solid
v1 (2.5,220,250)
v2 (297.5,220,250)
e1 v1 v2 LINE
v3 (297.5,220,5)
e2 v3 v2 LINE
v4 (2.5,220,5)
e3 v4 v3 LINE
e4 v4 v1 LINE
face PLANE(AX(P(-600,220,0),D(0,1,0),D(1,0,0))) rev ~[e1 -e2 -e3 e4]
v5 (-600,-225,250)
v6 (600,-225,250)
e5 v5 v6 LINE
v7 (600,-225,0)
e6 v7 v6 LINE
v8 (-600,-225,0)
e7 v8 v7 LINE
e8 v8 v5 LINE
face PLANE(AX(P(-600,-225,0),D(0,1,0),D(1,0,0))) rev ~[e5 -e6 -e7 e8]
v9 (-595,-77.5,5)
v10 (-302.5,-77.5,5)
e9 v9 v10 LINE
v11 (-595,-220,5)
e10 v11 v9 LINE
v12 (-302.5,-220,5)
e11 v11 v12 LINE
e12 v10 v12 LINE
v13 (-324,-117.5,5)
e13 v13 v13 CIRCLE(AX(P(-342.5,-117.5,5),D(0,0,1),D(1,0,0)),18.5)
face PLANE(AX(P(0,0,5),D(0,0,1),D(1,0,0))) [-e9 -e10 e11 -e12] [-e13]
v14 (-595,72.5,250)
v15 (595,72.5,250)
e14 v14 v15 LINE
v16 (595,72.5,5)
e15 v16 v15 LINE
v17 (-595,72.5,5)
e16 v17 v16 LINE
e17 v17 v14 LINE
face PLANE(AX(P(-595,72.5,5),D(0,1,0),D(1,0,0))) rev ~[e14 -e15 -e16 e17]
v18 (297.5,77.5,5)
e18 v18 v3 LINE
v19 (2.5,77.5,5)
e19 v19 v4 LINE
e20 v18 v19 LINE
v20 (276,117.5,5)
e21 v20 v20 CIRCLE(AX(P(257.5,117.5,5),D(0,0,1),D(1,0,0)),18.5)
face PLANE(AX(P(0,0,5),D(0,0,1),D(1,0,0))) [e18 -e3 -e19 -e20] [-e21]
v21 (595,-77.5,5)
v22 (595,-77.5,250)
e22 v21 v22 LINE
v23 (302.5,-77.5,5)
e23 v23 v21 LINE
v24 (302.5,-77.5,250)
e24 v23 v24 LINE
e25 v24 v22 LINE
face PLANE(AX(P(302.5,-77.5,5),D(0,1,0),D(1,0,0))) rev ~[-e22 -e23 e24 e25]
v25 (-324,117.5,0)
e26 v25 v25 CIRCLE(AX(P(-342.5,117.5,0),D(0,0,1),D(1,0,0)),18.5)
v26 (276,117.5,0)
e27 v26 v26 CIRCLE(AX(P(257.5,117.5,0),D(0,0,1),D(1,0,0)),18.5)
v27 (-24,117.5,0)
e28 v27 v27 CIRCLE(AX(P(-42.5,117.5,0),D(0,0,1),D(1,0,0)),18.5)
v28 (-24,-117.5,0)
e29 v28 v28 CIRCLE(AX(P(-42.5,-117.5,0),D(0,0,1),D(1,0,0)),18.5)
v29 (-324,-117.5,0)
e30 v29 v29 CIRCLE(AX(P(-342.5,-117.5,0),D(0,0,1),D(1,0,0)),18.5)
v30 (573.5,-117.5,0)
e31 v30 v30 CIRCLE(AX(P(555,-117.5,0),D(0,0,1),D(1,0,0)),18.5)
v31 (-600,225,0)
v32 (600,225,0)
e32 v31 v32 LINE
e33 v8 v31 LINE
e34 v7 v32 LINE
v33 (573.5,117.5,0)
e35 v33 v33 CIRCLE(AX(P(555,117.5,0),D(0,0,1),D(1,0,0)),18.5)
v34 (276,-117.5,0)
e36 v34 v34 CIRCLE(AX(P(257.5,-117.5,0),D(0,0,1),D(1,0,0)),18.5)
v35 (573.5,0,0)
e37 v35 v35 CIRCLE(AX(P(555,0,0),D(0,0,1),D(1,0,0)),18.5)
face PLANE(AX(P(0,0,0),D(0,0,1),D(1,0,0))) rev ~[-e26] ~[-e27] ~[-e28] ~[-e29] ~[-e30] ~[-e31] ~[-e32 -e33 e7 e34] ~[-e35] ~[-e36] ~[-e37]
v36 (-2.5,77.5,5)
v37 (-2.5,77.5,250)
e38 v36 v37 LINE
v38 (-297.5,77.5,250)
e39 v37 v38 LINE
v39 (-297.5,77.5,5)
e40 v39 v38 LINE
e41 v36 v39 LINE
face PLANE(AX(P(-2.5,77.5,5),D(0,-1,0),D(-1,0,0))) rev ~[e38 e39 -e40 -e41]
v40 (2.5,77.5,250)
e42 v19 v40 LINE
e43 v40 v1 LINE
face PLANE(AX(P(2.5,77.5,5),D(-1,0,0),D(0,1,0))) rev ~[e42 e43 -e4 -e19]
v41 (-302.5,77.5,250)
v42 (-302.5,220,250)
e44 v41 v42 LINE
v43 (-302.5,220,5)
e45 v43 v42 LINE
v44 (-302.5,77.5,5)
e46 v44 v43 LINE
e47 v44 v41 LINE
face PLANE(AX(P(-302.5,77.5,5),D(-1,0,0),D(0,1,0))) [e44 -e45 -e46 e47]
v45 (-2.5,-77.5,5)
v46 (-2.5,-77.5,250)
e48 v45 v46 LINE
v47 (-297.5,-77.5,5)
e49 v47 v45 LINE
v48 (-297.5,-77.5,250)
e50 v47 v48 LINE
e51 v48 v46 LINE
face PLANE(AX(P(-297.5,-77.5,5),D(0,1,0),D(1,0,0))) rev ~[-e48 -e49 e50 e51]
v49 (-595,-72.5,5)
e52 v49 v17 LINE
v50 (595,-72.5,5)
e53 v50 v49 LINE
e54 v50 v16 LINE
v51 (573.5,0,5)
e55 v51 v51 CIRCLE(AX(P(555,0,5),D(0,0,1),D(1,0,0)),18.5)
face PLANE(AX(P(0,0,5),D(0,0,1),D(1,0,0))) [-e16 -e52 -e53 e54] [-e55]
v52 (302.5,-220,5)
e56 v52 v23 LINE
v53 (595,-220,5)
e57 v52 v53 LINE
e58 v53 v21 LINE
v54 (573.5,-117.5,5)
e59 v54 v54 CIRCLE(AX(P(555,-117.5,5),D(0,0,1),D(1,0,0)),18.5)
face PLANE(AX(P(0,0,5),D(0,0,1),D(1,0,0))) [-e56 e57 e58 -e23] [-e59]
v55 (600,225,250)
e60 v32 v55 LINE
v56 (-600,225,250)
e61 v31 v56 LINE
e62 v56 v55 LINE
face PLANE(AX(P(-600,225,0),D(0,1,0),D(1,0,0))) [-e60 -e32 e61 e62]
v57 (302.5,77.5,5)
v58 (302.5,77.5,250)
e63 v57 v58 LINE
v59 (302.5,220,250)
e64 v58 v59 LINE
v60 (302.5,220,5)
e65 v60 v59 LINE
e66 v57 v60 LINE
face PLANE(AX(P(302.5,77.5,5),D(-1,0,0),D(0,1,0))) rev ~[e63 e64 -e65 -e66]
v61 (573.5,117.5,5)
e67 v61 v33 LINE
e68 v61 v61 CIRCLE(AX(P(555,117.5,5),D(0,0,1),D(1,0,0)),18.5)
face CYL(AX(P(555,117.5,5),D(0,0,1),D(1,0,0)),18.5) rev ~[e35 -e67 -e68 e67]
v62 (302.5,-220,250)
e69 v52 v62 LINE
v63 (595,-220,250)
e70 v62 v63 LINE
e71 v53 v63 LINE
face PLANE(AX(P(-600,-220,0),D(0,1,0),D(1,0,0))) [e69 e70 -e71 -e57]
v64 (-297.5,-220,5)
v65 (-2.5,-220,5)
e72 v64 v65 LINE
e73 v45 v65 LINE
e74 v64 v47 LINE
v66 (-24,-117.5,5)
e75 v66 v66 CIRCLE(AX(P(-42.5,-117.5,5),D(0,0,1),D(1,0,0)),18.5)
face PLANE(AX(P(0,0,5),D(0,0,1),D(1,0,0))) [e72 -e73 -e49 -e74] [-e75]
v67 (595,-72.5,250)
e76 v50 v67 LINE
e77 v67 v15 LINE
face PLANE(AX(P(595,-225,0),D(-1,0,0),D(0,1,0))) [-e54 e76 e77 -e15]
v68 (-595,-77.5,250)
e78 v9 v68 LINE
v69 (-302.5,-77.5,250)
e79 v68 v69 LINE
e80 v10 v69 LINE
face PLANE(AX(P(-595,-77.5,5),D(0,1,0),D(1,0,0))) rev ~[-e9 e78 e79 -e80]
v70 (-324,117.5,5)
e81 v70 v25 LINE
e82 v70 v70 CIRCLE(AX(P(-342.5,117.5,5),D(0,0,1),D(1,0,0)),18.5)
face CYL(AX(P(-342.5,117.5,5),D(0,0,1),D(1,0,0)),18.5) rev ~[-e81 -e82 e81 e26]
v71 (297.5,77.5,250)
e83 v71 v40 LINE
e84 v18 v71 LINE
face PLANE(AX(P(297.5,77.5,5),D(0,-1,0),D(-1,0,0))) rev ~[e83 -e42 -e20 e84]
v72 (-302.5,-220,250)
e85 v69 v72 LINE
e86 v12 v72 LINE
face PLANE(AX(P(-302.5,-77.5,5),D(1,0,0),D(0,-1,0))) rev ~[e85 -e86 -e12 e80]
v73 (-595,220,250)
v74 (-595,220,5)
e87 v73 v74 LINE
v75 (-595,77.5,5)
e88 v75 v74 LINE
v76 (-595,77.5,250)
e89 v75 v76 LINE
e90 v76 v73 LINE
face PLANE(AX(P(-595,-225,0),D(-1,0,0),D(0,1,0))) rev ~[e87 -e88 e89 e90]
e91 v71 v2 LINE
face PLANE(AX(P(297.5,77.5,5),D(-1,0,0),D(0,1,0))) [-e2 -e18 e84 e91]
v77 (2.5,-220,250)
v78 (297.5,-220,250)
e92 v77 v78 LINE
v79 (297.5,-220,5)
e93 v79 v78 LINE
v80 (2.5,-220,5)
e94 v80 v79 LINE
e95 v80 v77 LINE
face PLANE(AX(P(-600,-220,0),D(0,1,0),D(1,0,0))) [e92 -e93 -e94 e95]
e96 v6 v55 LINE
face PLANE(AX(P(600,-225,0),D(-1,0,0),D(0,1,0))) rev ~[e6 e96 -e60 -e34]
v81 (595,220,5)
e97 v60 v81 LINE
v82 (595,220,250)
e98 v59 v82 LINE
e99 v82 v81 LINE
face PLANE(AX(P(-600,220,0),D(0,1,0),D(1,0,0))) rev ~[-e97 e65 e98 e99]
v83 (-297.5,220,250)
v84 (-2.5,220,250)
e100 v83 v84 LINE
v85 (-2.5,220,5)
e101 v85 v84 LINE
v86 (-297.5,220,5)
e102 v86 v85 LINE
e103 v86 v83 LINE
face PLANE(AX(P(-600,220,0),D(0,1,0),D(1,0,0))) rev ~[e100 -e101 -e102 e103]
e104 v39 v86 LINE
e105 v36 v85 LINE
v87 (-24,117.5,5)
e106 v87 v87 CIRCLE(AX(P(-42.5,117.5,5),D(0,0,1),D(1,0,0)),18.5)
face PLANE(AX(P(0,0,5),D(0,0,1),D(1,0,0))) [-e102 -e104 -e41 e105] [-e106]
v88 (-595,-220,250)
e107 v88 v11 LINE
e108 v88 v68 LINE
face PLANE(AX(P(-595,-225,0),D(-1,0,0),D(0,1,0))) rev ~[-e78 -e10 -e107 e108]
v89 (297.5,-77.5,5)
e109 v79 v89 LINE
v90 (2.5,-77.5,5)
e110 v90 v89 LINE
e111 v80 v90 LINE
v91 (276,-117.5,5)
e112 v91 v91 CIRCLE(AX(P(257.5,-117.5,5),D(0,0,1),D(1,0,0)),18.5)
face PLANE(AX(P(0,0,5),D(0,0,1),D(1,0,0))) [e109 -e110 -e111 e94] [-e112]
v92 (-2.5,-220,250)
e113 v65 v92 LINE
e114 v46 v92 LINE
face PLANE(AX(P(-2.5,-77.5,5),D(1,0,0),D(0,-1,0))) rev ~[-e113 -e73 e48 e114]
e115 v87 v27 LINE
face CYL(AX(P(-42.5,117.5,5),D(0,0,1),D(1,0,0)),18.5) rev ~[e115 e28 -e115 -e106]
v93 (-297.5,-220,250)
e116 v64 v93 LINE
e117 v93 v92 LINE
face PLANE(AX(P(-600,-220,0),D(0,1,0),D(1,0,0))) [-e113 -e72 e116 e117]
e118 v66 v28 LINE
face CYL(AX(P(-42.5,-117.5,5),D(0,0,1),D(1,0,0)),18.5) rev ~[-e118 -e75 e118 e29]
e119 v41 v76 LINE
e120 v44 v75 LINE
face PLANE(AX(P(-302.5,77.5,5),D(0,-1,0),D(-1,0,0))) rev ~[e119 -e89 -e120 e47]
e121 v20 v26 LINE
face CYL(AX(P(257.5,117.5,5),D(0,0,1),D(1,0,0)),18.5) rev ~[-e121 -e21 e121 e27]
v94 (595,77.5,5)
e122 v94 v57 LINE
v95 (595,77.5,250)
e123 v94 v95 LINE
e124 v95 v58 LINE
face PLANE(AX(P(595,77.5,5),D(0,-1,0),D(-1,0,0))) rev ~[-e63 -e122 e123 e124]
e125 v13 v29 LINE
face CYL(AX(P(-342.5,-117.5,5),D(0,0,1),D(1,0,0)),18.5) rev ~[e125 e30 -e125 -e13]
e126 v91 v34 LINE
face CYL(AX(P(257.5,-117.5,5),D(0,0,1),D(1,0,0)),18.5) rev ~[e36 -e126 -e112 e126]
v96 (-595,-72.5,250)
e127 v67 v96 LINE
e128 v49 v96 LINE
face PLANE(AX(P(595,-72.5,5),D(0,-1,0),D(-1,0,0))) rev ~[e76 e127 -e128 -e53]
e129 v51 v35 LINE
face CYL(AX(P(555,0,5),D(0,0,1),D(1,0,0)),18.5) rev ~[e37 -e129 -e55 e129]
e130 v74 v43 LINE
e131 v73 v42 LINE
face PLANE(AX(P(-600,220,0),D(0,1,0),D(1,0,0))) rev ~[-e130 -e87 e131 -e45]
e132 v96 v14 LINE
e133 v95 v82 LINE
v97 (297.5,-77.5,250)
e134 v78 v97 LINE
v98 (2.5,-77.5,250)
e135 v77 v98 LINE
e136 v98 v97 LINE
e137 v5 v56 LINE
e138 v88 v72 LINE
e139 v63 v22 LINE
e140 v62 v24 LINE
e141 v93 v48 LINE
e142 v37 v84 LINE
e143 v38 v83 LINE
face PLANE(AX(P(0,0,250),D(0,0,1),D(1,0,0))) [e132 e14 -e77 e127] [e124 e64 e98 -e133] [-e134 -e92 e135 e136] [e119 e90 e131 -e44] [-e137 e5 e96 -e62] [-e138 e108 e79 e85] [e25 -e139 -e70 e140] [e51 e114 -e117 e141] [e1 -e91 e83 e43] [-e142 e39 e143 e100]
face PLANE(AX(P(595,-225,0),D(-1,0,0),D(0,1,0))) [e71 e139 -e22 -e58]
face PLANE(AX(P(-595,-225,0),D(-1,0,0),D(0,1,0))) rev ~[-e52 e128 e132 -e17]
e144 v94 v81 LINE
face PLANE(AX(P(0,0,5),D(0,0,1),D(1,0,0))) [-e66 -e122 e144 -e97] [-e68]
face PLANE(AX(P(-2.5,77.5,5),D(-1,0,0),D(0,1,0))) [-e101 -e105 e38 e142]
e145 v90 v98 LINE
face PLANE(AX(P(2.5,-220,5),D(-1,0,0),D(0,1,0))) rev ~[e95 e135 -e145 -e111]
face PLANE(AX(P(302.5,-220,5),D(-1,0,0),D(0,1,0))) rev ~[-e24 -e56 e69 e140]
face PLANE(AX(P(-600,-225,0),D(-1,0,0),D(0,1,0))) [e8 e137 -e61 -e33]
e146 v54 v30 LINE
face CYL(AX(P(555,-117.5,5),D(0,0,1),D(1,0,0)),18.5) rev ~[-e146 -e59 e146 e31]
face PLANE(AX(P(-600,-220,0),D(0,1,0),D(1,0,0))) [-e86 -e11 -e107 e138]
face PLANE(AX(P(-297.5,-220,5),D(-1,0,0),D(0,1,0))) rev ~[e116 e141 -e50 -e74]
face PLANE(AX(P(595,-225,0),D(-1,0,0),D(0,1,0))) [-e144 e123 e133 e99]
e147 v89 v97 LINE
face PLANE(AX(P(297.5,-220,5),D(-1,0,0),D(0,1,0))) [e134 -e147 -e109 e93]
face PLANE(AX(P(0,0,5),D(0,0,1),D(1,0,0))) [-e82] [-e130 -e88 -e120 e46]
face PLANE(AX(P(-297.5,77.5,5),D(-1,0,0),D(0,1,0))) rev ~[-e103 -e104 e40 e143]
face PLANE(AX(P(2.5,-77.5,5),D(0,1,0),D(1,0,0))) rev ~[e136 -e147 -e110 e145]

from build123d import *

# Parameters (mm, degrees)
F0_W     = 1200
F0_H     = 450
F1_DEPTH = 250
F2_T     = -5
F3_W     = 5
F3_H     = 142.5
F3_H_2   = 5
F4_DEPTH = 245
F5_R     = 18.5
F6_DEPTH = 25


with BuildPart() as f1:
    # F0 (on Top) → F1 (new body)
    with BuildSketch(Plane.XY):
        Rectangle(F0_W, F0_H)
    extrude(amount=F1_DEPTH)

    # F2
    f2_openings = [f1.faces().sort_by_distance(p)[0] for p in [
        (0, 0, 250),
    ]]
    offset(amount=F2_T, openings=f2_openings)

    # F3 (on face) → F4 (join, through all)
    with BuildSketch(Plane.XY.offset(5)):
        Polygon((302.5, -77.5), (595, -77.5), (595, -72.5), (2.5, -72.5), (-595, -72.5), (-595, -75), (-595, -77.5), (-302.5, -77.5), (-297.5, -77.5), (-2.5, -77.5), (2.5, -77.5), (297.5, -77.5), align=None)
        with Locations((300, -148.75)):
            Rectangle(F3_W, F3_H)
        Polygon((2.5, 72.5), (595, 72.5), (595, 77.5), (302.5, 77.5), (297.5, 77.5), (2.5, 77.5), align=None)
        Polygon((0, -220), (2.5, -220), (2.5, -77.5), (-2.5, -77.5), (-2.5, -220), align=None)
        with Locations((0, 75)):
            Rectangle(F3_W, F3_H_2)
        with Locations((300, 148.75)):
            Rectangle(F3_W, F3_H)
        Polygon((-595, 72.5), (-2.5, 72.5), (-2.5, 77.5), (-297.5, 77.5), (-302.5, 77.5), (-595, 77.5), (-595, 75), align=None)
        with Locations((0, 148.75)):
            Rectangle(F3_W, F3_H)
        Polygon((-297.5, -220), (-297.5, -77.5), (-302.5, -77.5), (-302.5, -220), (-300, -220), align=None)
        with Locations((-300, 148.75)):
            Rectangle(F3_W, F3_H)
    extrude(amount=F4_DEPTH)

    # F5 (on face) → F6 (cut)
    with BuildSketch(Plane.XY.offset(5)):
        with Locations((-42.5, 117.5)):
            Circle(F5_R)
        with Locations((-342.5, 117.5)):
            Circle(F5_R)
        with Locations((-342.5, -117.5)):
            Circle(F5_R)
        with Locations((-42.5, -117.5)):
            Circle(F5_R)
        with Locations((257.5, -117.5)):
            Circle(F5_R)
        with Locations((257.5, 117.5)):
            Circle(F5_R)
        with Locations((555, 117.5)):
            Circle(F5_R)
        with Locations((555, 0)):
            Circle(F5_R)
        with Locations((555, -117.5)):
            Circle(F5_R)
    extrude(amount=-F6_DEPTH, mode=Mode.SUBTRACT)


solid = f1.part
